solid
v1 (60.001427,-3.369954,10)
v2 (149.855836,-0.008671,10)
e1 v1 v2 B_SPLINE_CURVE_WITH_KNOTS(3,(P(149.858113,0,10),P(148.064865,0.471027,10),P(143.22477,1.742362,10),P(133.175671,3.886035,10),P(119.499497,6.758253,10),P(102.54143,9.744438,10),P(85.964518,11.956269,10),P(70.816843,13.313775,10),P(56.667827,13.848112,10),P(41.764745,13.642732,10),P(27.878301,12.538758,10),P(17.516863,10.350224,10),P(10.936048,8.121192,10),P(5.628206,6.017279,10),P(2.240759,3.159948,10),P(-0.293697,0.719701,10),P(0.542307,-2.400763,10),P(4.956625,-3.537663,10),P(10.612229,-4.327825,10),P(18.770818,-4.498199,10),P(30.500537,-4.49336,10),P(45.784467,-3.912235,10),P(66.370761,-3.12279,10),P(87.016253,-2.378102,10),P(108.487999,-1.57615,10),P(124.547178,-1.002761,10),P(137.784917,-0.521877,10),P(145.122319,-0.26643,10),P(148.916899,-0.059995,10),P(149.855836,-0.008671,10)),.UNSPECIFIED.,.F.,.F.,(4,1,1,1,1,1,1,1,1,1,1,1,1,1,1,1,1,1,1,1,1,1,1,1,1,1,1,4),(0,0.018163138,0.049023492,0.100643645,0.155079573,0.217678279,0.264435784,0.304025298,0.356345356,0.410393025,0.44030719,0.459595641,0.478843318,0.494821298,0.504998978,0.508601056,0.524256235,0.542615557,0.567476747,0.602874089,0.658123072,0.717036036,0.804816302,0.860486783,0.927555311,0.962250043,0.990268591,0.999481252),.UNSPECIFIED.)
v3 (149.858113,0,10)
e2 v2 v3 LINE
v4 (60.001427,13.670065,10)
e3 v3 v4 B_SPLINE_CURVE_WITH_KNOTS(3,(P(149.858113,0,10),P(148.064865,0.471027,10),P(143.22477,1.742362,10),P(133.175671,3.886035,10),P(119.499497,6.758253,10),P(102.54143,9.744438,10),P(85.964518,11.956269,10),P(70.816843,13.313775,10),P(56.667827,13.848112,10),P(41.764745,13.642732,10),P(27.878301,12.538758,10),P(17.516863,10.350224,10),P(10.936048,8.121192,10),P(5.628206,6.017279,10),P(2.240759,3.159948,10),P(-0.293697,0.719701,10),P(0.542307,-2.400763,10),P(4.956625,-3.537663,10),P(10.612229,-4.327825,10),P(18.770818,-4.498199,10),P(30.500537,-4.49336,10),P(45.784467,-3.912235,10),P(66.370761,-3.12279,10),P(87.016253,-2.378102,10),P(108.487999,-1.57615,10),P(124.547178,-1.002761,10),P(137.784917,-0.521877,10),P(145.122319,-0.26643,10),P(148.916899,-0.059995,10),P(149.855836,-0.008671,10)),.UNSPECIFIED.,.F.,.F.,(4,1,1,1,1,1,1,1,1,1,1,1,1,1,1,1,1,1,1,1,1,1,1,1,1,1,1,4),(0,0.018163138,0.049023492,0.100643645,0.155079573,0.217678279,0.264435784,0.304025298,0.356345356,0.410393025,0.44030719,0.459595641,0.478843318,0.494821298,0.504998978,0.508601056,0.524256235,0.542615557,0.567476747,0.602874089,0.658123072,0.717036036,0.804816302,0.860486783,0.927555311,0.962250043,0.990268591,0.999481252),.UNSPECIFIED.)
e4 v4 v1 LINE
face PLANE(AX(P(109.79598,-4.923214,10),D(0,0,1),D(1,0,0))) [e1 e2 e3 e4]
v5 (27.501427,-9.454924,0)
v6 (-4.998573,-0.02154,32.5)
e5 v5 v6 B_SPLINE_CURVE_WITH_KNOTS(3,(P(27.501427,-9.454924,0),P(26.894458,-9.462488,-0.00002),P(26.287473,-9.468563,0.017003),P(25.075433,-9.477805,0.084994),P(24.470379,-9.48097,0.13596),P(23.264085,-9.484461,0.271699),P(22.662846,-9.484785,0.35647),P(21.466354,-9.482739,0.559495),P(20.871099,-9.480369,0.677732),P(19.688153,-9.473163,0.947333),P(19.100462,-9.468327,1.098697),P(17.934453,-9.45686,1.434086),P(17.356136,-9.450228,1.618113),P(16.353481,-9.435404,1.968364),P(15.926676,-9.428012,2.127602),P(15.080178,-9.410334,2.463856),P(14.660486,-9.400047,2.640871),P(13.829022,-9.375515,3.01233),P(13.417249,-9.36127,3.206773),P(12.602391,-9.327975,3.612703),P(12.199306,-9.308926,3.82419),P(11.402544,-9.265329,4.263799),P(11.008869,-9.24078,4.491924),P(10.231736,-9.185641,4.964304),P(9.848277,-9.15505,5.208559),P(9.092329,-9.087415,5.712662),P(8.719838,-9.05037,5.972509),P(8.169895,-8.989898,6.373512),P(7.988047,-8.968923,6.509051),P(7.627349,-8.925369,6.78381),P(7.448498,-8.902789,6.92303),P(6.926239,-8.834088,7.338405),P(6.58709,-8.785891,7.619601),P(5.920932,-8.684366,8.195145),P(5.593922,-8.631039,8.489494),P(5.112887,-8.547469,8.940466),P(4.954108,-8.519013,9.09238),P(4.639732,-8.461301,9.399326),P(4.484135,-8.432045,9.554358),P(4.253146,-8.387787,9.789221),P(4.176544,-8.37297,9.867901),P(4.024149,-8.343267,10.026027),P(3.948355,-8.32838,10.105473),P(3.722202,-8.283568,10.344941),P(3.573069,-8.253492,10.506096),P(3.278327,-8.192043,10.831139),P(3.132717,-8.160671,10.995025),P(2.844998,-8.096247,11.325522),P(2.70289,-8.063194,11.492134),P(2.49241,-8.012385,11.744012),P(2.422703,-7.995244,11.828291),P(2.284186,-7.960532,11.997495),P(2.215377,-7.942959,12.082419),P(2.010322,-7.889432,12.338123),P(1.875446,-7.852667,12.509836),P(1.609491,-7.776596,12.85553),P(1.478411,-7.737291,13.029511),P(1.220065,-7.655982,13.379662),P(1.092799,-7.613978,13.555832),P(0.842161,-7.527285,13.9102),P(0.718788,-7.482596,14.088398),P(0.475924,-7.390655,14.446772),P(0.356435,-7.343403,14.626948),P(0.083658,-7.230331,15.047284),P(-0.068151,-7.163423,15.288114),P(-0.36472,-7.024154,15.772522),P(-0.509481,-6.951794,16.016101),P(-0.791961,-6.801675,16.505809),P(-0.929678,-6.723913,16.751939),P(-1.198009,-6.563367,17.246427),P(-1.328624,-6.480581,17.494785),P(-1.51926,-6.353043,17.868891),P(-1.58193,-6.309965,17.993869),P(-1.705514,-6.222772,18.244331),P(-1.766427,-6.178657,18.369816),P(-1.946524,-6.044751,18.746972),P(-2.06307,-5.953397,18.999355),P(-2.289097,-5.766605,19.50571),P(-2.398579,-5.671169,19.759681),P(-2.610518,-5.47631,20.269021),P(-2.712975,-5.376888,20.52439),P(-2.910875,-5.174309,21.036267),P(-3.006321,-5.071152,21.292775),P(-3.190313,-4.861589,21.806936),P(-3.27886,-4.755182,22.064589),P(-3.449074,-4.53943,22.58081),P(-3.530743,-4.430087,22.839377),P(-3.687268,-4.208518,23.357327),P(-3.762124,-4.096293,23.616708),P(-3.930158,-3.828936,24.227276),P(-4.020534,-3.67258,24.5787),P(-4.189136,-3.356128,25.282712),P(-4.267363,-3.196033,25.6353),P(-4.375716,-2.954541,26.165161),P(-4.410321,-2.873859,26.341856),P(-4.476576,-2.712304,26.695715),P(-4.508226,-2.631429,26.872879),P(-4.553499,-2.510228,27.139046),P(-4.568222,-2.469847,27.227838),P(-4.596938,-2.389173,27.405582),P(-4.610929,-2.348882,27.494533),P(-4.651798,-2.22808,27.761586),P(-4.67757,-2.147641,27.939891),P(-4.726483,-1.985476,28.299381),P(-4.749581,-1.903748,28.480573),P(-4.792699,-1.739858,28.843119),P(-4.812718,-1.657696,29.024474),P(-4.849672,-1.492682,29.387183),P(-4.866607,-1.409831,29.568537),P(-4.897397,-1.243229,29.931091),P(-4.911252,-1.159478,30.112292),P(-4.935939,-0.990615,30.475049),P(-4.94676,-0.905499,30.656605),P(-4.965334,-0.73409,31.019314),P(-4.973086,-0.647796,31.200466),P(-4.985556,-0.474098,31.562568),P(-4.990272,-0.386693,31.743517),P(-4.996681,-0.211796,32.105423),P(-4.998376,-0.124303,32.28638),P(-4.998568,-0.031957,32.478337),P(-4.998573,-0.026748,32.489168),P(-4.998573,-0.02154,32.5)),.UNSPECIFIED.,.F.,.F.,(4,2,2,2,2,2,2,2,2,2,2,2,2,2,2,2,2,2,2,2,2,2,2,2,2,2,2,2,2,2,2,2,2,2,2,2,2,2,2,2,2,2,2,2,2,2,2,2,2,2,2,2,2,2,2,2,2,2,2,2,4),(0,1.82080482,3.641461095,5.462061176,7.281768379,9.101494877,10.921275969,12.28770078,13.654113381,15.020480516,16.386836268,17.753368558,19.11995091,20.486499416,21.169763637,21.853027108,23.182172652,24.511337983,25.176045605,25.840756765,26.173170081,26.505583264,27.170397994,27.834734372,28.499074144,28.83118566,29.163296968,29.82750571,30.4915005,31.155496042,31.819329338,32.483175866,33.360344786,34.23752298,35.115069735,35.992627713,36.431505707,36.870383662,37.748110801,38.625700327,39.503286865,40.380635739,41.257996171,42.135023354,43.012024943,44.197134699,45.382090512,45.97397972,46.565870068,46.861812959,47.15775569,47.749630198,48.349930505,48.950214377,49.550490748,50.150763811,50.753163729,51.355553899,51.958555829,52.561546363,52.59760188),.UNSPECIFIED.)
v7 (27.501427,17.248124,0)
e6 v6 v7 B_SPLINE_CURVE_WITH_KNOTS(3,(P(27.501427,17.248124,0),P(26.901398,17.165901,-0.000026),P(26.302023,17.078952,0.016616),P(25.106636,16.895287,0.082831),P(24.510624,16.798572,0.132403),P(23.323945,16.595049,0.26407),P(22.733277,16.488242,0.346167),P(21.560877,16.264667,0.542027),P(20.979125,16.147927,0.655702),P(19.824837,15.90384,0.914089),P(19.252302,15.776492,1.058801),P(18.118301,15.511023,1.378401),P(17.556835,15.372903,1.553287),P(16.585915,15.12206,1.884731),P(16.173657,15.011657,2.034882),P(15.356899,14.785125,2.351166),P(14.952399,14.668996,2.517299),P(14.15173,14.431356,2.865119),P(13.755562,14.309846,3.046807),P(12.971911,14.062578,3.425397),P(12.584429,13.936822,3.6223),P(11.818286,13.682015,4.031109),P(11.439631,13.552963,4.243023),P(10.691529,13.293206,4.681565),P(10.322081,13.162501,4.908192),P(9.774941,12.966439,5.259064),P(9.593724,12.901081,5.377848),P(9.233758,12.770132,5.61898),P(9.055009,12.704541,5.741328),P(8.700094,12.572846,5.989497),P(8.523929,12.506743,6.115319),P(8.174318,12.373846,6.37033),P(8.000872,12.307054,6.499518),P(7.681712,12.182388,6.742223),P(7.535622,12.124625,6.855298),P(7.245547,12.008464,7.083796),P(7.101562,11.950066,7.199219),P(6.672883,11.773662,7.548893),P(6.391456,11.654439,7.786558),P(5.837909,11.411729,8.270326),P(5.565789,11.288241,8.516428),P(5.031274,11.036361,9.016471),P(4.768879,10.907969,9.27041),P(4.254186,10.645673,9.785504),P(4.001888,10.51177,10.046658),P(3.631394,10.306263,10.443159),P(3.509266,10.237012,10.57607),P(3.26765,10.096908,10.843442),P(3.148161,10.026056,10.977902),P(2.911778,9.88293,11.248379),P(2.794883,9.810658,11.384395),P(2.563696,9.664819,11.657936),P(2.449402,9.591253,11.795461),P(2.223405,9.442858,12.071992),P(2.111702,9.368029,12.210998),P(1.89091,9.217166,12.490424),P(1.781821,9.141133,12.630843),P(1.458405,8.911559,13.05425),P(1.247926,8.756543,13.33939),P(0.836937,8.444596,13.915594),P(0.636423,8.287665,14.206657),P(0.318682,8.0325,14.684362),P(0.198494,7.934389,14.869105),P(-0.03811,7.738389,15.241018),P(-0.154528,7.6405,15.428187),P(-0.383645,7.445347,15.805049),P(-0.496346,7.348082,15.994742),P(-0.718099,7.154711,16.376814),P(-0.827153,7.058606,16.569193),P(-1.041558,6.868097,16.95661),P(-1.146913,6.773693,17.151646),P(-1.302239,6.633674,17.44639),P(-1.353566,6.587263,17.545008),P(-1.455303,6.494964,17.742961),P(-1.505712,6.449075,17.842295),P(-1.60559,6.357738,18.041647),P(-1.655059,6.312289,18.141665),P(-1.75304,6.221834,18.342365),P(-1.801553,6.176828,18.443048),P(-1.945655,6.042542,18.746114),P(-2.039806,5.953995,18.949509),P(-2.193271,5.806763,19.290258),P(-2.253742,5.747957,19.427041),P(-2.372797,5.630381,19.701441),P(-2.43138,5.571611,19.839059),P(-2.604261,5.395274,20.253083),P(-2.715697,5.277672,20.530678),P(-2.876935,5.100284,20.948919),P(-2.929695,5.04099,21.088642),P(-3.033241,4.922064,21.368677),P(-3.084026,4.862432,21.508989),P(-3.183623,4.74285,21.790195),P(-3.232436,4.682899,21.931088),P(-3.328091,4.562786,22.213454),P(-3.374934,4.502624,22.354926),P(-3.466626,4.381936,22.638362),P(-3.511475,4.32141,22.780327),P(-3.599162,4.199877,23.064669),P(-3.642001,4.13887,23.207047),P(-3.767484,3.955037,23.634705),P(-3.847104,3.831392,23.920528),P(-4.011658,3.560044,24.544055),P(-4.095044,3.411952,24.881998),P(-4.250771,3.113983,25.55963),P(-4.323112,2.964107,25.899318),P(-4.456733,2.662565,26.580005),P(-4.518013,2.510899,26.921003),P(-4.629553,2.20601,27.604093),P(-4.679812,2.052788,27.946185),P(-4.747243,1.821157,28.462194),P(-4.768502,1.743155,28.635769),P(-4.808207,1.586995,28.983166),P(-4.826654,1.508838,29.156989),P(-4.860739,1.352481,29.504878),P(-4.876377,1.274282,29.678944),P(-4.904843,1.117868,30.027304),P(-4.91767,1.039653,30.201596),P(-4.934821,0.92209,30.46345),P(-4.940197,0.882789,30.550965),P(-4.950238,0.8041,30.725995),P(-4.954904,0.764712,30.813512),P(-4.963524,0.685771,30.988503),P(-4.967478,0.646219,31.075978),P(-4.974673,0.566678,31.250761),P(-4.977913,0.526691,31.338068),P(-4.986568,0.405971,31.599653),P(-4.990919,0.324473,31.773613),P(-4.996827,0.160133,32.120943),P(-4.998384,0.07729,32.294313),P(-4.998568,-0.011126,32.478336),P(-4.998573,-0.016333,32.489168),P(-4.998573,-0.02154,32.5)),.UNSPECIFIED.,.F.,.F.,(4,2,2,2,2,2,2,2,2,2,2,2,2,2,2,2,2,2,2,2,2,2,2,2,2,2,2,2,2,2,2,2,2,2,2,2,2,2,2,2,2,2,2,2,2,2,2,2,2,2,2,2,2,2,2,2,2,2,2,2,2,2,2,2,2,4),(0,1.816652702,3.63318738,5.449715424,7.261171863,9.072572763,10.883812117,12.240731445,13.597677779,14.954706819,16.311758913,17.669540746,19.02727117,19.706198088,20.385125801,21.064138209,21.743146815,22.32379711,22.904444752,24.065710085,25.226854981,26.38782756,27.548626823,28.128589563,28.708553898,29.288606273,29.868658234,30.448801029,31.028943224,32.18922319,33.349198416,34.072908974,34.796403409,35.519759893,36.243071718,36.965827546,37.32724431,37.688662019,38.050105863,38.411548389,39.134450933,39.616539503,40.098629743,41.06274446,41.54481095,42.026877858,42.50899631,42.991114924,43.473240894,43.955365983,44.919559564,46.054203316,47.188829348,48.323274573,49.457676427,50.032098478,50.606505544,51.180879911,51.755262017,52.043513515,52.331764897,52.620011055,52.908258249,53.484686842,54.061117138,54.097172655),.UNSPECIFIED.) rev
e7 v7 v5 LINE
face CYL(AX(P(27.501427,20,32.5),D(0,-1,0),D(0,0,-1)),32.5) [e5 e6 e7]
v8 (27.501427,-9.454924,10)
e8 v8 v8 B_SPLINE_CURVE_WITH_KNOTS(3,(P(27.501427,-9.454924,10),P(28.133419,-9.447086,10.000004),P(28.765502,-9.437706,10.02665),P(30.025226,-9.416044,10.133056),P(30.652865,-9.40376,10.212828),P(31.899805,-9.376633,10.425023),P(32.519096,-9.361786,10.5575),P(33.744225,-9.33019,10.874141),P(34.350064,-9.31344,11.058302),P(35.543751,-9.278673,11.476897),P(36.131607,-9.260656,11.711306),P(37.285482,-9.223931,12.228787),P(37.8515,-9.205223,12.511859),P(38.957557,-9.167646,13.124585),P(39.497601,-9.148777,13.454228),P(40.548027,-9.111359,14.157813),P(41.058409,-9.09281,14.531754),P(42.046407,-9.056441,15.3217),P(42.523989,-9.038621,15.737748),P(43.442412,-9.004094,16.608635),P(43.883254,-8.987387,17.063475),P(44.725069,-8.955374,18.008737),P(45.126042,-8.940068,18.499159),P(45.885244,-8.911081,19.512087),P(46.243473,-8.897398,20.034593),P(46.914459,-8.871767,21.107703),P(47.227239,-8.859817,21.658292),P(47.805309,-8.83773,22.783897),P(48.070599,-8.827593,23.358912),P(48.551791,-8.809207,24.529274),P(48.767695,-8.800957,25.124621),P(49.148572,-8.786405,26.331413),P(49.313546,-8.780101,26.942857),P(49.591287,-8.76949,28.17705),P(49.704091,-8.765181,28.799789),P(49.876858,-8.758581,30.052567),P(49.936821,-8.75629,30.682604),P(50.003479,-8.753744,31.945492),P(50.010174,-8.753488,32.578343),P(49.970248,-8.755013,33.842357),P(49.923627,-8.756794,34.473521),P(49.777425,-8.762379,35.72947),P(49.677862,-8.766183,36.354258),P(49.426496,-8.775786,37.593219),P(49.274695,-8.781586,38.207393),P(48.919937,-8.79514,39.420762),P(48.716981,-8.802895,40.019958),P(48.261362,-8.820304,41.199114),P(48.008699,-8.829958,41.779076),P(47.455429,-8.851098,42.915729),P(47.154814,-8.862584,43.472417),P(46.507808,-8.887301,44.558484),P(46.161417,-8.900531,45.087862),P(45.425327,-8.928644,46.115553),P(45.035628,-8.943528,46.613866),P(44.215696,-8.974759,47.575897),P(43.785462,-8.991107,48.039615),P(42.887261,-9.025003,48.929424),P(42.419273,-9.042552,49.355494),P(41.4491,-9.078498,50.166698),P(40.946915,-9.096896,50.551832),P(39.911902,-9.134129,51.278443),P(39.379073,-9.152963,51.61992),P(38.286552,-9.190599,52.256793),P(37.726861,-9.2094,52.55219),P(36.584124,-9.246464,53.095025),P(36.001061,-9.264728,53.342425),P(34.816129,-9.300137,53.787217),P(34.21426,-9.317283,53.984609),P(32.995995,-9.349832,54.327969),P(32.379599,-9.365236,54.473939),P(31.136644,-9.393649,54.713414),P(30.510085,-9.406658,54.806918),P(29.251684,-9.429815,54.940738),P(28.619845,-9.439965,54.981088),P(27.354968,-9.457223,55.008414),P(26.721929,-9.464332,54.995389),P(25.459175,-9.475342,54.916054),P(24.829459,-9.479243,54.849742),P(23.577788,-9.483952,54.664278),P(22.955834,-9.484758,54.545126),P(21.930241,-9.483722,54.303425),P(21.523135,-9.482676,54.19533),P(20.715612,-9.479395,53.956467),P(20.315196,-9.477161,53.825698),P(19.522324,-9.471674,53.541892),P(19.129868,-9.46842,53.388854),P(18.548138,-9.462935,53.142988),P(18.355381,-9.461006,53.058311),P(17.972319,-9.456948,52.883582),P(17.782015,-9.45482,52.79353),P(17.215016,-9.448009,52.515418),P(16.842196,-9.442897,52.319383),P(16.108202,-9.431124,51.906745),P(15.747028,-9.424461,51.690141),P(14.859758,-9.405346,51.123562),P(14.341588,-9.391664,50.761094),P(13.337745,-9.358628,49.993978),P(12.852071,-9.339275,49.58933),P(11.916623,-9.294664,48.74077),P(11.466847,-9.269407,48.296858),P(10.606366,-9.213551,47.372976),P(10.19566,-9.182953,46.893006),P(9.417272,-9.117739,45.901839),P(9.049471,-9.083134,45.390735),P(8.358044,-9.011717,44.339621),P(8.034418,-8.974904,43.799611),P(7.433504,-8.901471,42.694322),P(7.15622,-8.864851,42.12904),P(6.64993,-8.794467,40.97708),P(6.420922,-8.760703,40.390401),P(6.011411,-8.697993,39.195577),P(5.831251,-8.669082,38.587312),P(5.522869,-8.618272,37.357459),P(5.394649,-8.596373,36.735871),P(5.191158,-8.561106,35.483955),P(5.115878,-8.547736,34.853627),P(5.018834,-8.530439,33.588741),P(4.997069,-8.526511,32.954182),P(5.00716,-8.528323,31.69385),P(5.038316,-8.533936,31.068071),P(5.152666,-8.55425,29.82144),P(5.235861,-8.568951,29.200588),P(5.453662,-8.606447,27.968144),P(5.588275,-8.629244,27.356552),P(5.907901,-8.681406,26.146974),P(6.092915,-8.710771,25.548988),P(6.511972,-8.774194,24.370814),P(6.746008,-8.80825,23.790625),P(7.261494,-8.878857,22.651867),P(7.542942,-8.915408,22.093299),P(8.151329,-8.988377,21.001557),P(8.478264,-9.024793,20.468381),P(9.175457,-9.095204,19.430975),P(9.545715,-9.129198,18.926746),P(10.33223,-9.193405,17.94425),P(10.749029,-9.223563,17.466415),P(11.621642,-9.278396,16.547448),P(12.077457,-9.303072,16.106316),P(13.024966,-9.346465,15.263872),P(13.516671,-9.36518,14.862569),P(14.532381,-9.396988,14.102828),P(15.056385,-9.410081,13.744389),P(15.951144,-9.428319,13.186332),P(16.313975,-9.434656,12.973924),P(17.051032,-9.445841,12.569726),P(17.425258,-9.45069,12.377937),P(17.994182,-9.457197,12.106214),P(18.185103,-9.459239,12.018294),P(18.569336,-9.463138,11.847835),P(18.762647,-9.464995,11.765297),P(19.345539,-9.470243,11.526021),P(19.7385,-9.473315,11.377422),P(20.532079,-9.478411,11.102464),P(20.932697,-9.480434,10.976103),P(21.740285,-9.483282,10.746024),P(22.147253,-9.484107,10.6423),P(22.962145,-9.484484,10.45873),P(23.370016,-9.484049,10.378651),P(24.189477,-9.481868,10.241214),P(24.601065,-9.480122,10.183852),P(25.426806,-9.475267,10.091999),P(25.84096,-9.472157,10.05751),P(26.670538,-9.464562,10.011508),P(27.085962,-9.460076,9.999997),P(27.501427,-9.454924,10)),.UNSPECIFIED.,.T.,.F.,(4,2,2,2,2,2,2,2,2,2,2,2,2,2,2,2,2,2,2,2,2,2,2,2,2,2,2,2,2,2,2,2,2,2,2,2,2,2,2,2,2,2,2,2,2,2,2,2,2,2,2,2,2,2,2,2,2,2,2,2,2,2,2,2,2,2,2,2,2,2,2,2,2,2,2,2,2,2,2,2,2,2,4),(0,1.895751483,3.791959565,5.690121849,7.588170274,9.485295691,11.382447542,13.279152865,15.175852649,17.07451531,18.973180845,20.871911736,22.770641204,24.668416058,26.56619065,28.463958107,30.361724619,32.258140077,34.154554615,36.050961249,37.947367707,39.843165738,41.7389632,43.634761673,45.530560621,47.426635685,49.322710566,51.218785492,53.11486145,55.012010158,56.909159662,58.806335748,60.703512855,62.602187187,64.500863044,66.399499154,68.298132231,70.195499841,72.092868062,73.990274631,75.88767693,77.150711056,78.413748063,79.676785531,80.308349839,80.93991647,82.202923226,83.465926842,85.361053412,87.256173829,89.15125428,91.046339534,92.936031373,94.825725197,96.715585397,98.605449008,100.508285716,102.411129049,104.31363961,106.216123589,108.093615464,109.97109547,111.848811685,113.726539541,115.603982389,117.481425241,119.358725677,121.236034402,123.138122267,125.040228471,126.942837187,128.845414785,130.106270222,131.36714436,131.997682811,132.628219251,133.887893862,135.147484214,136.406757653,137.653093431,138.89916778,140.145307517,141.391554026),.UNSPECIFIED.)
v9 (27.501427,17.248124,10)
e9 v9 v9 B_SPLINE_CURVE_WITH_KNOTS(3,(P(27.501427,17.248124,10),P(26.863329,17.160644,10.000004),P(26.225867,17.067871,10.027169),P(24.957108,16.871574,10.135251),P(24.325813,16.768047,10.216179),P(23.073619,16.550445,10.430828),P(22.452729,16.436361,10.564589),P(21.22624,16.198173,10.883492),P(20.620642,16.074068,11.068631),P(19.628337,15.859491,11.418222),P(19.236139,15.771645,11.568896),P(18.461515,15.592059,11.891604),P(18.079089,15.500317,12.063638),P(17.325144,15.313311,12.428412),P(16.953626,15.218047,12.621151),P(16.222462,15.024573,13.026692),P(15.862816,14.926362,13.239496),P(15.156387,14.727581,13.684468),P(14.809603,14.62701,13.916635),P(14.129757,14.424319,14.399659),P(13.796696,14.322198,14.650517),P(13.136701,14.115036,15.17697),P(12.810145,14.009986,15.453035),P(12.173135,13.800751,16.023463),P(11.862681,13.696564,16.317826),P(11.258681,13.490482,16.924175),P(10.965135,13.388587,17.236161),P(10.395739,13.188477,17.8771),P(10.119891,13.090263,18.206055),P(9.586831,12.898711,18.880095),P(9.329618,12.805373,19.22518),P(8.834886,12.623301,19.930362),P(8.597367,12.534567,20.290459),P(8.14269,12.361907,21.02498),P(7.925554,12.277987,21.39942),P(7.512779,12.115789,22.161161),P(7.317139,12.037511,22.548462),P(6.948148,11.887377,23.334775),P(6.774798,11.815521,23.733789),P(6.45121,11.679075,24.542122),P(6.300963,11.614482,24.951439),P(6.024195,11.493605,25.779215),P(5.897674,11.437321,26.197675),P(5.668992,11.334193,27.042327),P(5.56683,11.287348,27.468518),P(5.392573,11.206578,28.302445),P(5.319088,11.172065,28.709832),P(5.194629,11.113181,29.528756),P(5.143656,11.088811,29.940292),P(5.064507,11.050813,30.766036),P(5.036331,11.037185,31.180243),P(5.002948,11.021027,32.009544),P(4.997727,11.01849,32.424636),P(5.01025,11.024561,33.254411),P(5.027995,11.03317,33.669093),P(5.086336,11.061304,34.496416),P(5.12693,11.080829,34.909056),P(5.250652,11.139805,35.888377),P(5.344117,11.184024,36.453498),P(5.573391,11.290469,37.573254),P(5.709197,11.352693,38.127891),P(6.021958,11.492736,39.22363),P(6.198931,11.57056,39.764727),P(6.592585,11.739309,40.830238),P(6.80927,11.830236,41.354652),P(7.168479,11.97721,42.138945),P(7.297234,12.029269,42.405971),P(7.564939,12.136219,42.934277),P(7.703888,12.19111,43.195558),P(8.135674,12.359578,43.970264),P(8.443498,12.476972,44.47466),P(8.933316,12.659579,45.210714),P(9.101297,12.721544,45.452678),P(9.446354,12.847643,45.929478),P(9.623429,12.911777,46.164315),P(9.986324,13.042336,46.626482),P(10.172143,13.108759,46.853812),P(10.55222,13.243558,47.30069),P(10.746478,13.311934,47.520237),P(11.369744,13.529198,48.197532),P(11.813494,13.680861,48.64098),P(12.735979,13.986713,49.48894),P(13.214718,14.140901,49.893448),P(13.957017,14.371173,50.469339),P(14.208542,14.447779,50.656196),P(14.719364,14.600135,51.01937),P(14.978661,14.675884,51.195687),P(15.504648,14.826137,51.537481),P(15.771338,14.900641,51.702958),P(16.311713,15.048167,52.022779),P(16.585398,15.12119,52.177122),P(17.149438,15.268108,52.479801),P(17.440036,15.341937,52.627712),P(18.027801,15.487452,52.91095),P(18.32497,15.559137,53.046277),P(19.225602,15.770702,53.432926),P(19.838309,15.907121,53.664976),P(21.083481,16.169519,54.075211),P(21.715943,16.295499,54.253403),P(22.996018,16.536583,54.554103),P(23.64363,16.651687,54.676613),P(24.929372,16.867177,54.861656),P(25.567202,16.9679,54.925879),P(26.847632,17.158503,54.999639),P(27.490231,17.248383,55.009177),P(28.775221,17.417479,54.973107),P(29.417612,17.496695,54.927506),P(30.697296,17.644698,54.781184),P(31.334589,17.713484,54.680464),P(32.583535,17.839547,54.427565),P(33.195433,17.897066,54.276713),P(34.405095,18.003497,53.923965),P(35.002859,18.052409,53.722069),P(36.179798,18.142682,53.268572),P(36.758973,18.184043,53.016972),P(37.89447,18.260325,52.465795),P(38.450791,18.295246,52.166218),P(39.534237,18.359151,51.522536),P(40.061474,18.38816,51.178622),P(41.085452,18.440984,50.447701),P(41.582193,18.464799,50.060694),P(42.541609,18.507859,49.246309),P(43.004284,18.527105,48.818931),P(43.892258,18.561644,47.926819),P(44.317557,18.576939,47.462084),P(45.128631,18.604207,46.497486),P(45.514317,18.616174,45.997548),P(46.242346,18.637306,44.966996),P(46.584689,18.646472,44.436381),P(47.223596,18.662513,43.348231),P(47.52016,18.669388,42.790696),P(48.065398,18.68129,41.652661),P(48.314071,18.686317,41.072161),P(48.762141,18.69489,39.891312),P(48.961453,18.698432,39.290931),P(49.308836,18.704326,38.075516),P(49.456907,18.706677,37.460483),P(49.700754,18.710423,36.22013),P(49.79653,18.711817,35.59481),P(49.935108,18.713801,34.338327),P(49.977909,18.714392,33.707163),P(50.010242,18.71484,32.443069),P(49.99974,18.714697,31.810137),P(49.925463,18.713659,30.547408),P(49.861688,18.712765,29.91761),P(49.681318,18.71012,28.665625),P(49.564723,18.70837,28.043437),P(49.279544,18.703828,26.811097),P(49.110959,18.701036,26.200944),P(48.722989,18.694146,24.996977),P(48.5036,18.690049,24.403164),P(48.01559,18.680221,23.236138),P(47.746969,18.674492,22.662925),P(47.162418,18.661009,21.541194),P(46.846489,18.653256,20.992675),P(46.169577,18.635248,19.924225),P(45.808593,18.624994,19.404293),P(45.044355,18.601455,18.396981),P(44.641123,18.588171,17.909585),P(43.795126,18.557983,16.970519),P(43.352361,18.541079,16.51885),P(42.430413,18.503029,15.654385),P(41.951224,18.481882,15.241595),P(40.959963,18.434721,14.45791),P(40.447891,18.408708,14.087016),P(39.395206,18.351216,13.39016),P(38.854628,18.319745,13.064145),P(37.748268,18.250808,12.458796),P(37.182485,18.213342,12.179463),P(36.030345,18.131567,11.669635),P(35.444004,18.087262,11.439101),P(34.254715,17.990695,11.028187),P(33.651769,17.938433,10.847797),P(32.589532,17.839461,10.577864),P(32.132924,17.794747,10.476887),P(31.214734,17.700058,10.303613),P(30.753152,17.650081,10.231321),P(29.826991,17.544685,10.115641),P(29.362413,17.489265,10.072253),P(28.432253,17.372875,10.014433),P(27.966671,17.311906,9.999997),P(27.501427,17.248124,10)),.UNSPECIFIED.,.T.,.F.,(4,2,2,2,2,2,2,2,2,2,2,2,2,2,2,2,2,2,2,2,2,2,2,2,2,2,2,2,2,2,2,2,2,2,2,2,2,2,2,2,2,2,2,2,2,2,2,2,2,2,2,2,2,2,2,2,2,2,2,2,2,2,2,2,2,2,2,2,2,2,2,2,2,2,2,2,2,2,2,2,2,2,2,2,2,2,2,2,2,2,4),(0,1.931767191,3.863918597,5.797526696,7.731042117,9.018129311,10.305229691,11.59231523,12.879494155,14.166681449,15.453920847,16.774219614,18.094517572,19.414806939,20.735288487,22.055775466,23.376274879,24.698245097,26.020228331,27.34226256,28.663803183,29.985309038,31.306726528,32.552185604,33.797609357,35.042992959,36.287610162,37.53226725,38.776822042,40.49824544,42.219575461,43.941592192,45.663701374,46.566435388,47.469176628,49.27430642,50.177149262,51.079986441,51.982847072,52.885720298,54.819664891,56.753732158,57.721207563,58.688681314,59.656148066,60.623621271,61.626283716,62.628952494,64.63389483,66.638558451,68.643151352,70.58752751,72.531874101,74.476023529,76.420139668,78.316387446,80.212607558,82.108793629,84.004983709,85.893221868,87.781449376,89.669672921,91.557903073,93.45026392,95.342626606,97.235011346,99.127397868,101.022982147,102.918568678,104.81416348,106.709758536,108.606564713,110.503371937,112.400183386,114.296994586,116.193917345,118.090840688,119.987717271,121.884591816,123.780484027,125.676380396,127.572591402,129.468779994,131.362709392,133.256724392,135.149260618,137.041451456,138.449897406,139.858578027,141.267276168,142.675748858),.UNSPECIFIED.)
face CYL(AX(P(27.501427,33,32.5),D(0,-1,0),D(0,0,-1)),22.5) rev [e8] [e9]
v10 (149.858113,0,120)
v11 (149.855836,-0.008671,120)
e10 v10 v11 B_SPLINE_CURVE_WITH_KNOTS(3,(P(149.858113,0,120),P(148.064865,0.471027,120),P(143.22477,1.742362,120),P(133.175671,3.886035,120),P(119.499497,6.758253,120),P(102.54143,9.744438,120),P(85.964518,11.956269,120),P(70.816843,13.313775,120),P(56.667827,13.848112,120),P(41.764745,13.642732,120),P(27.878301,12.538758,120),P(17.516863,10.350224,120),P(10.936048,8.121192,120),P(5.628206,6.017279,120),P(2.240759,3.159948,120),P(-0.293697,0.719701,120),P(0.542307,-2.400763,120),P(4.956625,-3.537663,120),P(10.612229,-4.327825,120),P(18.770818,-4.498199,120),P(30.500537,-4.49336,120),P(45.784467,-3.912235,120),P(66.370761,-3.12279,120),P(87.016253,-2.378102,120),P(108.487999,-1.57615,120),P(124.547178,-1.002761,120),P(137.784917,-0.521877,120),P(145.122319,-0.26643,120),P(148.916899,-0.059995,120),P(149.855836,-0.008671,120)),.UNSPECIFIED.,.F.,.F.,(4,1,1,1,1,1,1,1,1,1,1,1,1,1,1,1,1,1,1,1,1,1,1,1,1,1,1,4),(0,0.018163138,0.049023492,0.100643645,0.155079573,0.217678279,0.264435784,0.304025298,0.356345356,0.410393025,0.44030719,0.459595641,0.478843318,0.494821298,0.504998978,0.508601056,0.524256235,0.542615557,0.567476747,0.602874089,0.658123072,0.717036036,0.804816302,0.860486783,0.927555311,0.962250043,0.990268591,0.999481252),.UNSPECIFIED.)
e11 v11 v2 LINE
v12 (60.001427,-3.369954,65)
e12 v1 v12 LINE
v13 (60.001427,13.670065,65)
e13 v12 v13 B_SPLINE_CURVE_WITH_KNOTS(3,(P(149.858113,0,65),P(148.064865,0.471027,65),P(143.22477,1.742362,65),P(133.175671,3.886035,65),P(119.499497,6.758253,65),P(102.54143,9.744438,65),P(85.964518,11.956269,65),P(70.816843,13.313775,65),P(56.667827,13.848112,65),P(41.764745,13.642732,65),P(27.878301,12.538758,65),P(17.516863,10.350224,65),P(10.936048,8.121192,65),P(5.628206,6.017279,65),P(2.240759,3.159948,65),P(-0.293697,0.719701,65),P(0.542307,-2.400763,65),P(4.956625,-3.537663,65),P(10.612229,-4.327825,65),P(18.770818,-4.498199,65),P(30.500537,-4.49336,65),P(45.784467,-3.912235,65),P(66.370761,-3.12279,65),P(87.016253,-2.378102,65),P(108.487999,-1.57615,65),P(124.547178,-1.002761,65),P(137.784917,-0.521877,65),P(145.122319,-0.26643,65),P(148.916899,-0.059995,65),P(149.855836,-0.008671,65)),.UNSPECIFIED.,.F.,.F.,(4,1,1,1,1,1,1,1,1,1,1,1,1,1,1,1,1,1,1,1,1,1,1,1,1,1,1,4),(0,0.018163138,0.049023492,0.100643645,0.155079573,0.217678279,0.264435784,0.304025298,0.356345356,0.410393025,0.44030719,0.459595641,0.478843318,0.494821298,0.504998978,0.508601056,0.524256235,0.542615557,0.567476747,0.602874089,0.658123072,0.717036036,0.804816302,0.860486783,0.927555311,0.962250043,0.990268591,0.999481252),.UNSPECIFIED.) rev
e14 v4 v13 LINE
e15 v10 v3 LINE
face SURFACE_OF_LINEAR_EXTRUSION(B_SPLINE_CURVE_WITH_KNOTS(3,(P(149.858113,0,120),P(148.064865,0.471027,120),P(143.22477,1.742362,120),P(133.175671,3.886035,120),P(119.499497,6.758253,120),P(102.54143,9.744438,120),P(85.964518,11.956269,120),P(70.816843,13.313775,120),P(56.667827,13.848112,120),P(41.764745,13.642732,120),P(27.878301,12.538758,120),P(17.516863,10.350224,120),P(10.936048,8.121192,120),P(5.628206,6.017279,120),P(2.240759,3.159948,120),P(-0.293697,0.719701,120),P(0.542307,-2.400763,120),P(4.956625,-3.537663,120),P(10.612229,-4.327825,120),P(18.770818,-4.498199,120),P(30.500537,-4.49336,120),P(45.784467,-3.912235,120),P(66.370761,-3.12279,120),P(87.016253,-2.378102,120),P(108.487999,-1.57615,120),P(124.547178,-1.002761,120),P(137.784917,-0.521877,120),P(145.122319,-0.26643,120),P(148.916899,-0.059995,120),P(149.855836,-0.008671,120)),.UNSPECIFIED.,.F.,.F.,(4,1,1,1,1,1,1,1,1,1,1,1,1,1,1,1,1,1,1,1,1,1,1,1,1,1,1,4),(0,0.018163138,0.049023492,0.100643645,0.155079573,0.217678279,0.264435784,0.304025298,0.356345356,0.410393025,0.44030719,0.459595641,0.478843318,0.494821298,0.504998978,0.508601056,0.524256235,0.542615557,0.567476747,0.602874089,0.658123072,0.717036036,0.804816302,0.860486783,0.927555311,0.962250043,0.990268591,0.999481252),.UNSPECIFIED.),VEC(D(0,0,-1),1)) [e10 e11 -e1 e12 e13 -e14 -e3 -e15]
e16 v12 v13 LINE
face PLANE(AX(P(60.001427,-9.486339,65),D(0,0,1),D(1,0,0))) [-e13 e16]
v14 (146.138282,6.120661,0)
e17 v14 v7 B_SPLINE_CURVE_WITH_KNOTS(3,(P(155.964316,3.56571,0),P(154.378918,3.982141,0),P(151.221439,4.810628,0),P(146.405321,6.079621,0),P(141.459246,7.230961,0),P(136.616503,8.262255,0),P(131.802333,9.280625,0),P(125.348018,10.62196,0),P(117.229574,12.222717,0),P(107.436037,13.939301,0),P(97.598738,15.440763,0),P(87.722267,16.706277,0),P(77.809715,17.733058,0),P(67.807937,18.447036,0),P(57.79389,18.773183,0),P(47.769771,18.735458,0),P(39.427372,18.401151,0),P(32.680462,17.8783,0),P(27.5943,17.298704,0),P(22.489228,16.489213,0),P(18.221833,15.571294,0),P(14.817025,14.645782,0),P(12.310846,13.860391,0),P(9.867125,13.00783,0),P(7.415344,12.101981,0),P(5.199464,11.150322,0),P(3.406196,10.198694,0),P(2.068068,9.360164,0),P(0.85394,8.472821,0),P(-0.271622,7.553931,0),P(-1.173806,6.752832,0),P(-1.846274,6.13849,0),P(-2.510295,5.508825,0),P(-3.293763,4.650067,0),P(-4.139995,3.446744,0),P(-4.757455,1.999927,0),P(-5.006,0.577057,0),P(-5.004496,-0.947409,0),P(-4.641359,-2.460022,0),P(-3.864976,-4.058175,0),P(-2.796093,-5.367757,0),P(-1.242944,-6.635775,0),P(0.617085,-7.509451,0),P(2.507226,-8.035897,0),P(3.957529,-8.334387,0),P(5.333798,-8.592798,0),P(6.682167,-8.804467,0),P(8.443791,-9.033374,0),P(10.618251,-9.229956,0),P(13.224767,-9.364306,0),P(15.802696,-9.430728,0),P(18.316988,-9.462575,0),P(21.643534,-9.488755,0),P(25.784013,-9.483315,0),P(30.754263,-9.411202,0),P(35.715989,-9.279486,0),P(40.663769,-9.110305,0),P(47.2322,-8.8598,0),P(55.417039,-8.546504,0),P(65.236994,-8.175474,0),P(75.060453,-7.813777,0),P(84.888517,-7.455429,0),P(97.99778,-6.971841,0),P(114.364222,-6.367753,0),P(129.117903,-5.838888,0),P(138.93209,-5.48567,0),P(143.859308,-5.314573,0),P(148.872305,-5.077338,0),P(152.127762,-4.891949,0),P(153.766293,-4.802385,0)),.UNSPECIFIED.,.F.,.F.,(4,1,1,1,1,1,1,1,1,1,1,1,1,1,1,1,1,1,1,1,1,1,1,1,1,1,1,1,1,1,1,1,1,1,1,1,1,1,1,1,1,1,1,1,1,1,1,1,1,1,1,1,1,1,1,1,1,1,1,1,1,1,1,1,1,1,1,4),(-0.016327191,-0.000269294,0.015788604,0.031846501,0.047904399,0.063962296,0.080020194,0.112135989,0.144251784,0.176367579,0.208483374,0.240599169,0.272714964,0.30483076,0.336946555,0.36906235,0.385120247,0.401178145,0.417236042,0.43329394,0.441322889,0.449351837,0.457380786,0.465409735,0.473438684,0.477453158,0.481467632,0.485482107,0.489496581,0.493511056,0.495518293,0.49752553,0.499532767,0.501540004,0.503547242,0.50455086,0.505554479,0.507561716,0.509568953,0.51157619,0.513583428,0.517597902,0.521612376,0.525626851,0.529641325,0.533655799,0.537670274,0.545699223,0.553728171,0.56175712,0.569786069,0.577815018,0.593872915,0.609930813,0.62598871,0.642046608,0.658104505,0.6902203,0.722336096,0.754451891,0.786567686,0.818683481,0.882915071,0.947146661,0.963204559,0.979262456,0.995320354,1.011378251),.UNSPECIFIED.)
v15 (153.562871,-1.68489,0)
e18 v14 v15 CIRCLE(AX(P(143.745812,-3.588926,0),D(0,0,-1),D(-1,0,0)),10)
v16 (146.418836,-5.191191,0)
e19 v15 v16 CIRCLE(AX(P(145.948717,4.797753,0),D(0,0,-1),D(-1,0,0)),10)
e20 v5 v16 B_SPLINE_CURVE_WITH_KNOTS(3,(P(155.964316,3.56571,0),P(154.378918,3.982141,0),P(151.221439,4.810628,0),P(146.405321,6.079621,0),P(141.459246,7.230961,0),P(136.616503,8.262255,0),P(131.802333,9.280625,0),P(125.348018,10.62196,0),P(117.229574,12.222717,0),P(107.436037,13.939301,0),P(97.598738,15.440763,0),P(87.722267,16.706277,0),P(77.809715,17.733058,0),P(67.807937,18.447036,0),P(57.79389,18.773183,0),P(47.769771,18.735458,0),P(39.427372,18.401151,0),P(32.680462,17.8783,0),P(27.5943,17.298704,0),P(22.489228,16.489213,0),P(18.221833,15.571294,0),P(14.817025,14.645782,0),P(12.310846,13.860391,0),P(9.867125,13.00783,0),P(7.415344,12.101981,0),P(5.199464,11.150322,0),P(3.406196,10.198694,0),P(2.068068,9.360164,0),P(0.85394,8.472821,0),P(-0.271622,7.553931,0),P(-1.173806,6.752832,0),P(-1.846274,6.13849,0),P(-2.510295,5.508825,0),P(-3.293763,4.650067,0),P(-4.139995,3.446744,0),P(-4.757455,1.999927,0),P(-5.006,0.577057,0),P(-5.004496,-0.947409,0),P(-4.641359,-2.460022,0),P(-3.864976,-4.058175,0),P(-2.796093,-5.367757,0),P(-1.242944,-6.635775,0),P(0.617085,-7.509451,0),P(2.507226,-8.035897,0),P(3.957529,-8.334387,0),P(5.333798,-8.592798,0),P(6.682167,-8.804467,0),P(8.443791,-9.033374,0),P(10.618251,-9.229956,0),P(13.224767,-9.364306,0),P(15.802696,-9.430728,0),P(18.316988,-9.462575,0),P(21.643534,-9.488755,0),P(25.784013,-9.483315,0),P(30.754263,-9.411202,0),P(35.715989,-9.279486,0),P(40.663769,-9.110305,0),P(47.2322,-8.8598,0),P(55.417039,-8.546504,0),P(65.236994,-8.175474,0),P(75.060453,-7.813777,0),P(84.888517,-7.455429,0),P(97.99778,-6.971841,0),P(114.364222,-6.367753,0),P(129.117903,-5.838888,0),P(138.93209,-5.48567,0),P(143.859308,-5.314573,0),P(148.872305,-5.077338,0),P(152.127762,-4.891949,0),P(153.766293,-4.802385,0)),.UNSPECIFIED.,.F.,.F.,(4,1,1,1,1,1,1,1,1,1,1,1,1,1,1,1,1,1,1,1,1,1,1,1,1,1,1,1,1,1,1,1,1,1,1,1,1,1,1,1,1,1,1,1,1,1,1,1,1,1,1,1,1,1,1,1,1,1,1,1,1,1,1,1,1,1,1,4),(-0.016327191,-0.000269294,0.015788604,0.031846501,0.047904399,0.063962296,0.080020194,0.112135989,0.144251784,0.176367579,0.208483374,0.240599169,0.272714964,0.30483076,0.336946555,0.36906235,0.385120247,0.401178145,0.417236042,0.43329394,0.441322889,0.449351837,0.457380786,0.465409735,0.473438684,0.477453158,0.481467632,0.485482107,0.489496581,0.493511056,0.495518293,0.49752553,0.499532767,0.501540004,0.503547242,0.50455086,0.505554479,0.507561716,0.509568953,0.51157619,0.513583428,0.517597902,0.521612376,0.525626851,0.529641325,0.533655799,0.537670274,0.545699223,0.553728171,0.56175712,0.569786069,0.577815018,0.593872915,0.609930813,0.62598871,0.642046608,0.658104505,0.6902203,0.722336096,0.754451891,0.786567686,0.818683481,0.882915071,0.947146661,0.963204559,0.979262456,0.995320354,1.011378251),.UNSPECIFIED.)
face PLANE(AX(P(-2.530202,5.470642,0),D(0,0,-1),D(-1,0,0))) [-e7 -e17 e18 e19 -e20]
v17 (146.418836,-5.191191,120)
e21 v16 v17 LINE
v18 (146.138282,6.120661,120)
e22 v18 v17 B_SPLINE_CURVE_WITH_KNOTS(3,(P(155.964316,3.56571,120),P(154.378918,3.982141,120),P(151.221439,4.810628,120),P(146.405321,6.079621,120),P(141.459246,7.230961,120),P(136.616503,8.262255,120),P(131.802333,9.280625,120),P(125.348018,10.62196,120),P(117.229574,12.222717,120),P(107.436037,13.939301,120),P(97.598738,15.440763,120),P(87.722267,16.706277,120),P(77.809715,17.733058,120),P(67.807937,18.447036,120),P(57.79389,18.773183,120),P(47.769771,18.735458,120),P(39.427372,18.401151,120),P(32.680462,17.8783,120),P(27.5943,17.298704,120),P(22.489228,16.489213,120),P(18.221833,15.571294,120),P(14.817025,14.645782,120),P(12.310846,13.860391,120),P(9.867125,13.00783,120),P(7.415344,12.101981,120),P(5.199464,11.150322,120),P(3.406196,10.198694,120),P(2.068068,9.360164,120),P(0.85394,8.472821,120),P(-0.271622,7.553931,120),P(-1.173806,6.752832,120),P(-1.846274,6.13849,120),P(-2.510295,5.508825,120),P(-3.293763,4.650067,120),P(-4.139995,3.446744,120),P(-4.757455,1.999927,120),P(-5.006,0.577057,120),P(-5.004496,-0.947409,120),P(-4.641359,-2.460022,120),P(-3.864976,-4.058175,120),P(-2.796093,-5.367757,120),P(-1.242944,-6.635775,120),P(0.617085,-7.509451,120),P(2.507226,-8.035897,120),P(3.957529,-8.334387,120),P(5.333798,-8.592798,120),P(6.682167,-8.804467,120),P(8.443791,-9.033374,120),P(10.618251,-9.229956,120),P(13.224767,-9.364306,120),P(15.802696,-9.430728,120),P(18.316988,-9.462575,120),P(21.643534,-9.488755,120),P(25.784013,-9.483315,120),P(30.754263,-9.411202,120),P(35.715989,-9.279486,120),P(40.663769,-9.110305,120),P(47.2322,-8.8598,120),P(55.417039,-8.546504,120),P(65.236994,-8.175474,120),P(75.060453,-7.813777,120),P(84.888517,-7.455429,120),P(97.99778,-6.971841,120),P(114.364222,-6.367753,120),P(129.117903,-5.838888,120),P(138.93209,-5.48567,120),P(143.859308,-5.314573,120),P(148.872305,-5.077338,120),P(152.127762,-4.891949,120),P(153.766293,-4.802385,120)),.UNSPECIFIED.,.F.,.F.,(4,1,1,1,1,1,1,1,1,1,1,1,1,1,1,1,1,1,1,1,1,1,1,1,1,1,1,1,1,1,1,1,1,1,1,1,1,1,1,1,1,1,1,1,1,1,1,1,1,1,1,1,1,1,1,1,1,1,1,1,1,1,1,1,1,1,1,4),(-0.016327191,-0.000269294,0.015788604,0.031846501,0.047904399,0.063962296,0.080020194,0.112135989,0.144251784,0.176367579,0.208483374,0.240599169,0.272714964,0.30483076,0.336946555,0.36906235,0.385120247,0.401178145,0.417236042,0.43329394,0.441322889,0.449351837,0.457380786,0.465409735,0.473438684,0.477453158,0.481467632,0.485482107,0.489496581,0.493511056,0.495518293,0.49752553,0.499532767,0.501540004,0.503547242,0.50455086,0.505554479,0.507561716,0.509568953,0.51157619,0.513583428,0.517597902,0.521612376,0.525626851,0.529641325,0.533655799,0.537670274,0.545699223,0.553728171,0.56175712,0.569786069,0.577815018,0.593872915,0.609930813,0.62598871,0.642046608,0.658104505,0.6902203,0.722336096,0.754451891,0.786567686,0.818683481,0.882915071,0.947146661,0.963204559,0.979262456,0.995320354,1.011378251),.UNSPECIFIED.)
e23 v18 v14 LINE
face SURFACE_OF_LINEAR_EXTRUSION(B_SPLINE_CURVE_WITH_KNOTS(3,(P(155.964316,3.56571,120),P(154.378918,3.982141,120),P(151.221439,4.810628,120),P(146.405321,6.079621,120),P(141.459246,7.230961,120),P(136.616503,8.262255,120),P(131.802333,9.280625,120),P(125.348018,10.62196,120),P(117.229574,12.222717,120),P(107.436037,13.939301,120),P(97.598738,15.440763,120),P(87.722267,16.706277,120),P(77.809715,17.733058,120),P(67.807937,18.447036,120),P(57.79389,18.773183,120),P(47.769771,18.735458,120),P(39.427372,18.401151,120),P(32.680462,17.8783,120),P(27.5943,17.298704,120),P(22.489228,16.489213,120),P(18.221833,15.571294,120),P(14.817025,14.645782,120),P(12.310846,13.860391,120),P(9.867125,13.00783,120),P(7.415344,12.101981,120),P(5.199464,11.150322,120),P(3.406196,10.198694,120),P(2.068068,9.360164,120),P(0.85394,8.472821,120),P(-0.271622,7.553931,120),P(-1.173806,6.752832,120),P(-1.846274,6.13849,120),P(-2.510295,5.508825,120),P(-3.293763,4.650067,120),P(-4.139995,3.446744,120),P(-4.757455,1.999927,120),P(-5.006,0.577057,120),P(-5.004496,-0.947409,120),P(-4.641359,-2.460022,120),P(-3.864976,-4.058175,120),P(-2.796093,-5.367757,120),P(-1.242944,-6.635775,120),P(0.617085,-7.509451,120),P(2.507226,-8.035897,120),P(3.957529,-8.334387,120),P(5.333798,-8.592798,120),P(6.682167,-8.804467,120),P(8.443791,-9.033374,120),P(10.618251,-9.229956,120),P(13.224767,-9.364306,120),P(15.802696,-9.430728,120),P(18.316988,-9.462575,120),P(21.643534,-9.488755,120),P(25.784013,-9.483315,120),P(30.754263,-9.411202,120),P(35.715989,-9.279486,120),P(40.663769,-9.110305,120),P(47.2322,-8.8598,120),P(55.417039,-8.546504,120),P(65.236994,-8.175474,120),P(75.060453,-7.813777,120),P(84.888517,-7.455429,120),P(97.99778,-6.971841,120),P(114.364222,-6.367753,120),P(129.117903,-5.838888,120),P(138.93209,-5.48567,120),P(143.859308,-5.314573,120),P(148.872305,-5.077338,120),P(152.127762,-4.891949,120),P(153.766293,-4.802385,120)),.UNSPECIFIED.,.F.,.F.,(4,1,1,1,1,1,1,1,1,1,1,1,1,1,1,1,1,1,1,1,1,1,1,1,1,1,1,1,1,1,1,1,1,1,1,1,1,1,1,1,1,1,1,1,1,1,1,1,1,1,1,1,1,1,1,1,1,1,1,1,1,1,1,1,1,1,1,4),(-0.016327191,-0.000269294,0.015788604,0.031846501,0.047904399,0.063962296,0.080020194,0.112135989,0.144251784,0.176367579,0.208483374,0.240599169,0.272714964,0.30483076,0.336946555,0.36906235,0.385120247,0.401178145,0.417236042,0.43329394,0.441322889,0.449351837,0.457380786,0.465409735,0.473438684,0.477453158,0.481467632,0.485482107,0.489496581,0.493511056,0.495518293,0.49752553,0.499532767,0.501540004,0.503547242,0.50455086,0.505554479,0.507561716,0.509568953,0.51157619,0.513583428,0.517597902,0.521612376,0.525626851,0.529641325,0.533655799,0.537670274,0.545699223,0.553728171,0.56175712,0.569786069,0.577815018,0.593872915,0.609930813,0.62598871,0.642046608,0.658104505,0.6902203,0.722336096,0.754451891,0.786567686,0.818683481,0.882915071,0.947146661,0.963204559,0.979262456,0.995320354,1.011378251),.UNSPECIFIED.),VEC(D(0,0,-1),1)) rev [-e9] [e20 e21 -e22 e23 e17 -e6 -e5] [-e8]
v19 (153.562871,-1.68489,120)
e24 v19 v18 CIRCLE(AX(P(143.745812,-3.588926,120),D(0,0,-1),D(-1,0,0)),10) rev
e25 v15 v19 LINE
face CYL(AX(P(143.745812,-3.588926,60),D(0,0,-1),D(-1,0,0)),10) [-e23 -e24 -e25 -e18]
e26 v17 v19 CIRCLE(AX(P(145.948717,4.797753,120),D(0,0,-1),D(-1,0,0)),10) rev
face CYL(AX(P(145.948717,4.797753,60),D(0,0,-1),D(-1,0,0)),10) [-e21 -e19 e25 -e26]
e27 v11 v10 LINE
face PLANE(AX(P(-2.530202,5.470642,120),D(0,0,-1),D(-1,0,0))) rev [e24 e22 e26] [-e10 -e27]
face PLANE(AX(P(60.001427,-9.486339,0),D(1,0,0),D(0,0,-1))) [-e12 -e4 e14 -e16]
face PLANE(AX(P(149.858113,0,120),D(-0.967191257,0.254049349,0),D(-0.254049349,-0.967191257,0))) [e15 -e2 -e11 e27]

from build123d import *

# Parameters (mm, degrees)
BOSS_EXTRUDE1_DEPTH             = 120
BOSS_EXTRUDE2_DEPTH             = 10
BOSS_EXTRUDE3_REACH             = 199.677
SKETCH4_W                       = 65
SKETCH4_H                       = 65
BOSS_EXTRUDE3_DIRECTION_2_REACH = 199.677
CUT_EXTRUDE1_DEPTH              = 33
CUT_EXTRUDE1_DEPTH_BACK         = 25
SKETCH4_2_R                     = 22.5
FILLET1_START                   = -1
FILLET1_DEPTH                   = 121
CUT_EXTRUDE2_DEPTH              = 20
CUT_EXTRUDE2_DEPTH_BACK         = 15


with BuildPart() as part:
    # Sketch1 → Boss-Extrude1 (new body)
    with BuildSketch(Plane.XY):
        with BuildLine():
            Line((155.964316355, 3.565709543), (153.766293041, -4.802384858))
            add(Edge.make_bspline(
                [(155.964316355, 3.565709543), (154.378918322, 3.982141489), (151.221438672, 4.810628214), (146.405320696, 6.079621314), (141.459245587, 7.230960659), (136.616503343, 8.262254652), (131.802332964, 9.280625302), (125.348017994, 10.621960321), (117.229574348, 12.22271703), (107.436037499, 13.939301482), (97.598738468, 15.440763267), (87.722266926, 16.70627728), (77.809714958, 17.733057917), (67.80793717, 18.447035533), (57.793889713, 18.773182879), (47.769770538, 18.735457883), (39.427372262, 18.401151216), (32.680462384, 17.878299596), (27.594300218, 17.298704257), (22.489228117, 16.489212541), (18.221832789, 15.571293682), (14.817024759, 14.645782316), (12.31084577, 13.860390887), (9.867125223, 13.00783032), (7.415344177, 12.101980937), (5.199464012, 11.150322343), (3.406195729, 10.198694172), (2.068067577, 9.360164368), (0.853940441, 8.472821349), (-0.27162176, 7.553930707), (-1.173806492, 6.752832287), (-1.846273696, 6.138489504), (-2.510294599, 5.508824521), (-3.293762827, 4.650066841), (-4.139995357, 3.446744203), (-4.757454598, 1.999926732), (-5.006000217, 0.577057349), (-5.004495543, -0.947409484), (-4.641359358, -2.460021664), (-3.864975901, -4.058175269), (-2.796093096, -5.367757007), (-1.242943599, -6.635774778), (0.617085196, -7.509451493), (2.507225543, -8.035896586), (3.957529203, -8.334387132), (5.333798484, -8.592798441), (6.682167164, -8.804467221), (8.44379095, -9.033373876), (10.618251219, -9.22995636), (13.224767296, -9.364305661), (15.802696221, -9.430728222), (18.31698775, -9.462575421), (21.643533924, -9.488754653), (25.784013425, -9.483315396), (30.754262974, -9.411201744), (35.715989191, -9.27948568), (40.663768741, -9.11030498), (47.232199521, -8.859800124), (55.41703855, -8.546503659), (65.236994413, -8.175473725), (75.060452553, -7.813776944), (84.888517086, -7.455428603), (97.997779582, -6.971840733), (114.364222088, -6.367752612), (129.11790303, -5.838888298), (138.932090495, -5.485670307), (143.859307965, -5.314572629), (148.872305041, -5.077337716), (152.127761912, -4.891949037), (153.766293041, -4.802384858)],
                knots=[-0.016327191, -0.016327191, -0.016327191, -0.016327191, -0.000269294, 0.015788604, 0.031846501, 0.047904399, 0.063962296, 0.080020194, 0.112135989, 0.144251784, 0.176367579, 0.208483374, 0.240599169, 0.272714964, 0.30483076, 0.336946555, 0.36906235, 0.385120247, 0.401178145, 0.417236042, 0.43329394, 0.441322889, 0.449351837, 0.457380786, 0.465409735, 0.473438684, 0.477453158, 0.481467632, 0.485482107, 0.489496581, 0.493511056, 0.495518293, 0.49752553, 0.499532767, 0.501540004, 0.503547242, 0.50455086, 0.505554479, 0.507561716, 0.509568953, 0.51157619, 0.513583428, 0.517597902, 0.521612376, 0.525626851, 0.529641325, 0.533655799, 0.537670274, 0.545699223, 0.553728171, 0.56175712, 0.569786069, 0.577815018, 0.593872915, 0.609930813, 0.62598871, 0.642046608, 0.658104505, 0.6902203, 0.722336096, 0.754451891, 0.786567686, 0.818683481, 0.882915071, 0.947146661, 0.963204559, 0.979262456, 0.995320354, 1.011378251, 1.011378251, 1.011378251, 1.011378251], degree=3))
        make_face()
        with BuildLine():
            Line((149.858113324, 0), (149.855835651, -0.00867133))
            add(Edge.make_bspline(
                [(149.858113324, 0), (148.064864637, 0.471027481), (143.224769961, 1.742362118), (133.175670914, 3.886034627), (119.499496989, 6.758253215), (102.541429982, 9.744438365), (85.964517719, 11.956268792), (70.816843468, 13.313775138), (56.667826786, 13.848112216), (41.764744871, 13.642732387), (27.878301368, 12.538757837), (17.516862727, 10.350224421), (10.936048166, 8.121191966), (5.628206266, 6.017279046), (2.240759138, 3.159947775), (-0.293696922, 0.719700584), (0.542306535, -2.400763115), (4.956625023, -3.537663372), (10.612229447, -4.327824942), (18.770818109, -4.498199411), (30.500536827, -4.493359859), (45.784466548, -3.912234803), (66.370760986, -3.122790256), (87.01625275, -2.378102064), (108.487999193, -1.576150156), (124.547177916, -1.002761448), (137.784916862, -0.521876849), (145.122318881, -0.266429976), (148.916898874, -0.059994798), (149.855835651, -0.00867133)],
                knots=[0, 0, 0, 0, 0.018163138, 0.049023492, 0.100643645, 0.155079573, 0.217678279, 0.264435784, 0.304025298, 0.356345356, 0.410393025, 0.44030719, 0.459595641, 0.478843318, 0.494821298, 0.504998978, 0.508601056, 0.524256235, 0.542615557, 0.567476747, 0.602874089, 0.658123072, 0.717036036, 0.804816302, 0.860486783, 0.927555311, 0.962250043, 0.990268591, 0.999481252, 0.999481252, 0.999481252, 0.999481252], degree=3))
        make_face(mode=Mode.SUBTRACT)
    extrude(amount=BOSS_EXTRUDE1_DEPTH)

    # Sketch3 → Boss-Extrude2 (add)
    with BuildSketch(Plane(origin=(0, 0, 0), x_dir=(-1, 0, 0), z_dir=(0, 0, -1))):
        with BuildLine():
            add(Edge.make_bspline(
                [(0.878784699, 2.816886777), (-0.440330705, 4.35710096), (-6.432358309, 9.398319725), (-25.880607147, 15.556199748), (-57.640660956, 15.486635628), (-94.316428091, 14.90132494), (-121.955402319, 9.416295338), (-155.648348192, 3.742322043), (-152.299631395, -5.019044201), (-127.442883747, -2.619953533), (-110.657226211, -5.850784995), (-70.675350432, -4.951680612), (-43.15497178, -7.181610376), (-11.739005475, -7.267310955), (7.783964303, -5.245679637), (0.878784699, 2.816886777)],
                knots=[0, 0, 0, 0, 0.019858562, 0.056297241, 0.104261526, 0.197906982, 0.252888713, 0.300349685, 0.312342472, 0.372816584, 0.481473762, 0.67443882, 0.863490173, 0.896046291, 1, 1, 1, 1], degree=3))
        make_face()
    extrude(amount=-BOSS_EXTRUDE2_DEPTH)

    # Sketch4 → Boss-Extrude3 (add, up to next)
    with BuildSketch(Plane(origin=(0, 0, 0), x_dir=(1, 0, 0), z_dir=(0, 1, 0)), mode=Mode.PRIVATE) as boss_extrude3_sk1:
        with Locations((27.501426989, -32.5)):
            Rectangle(SKETCH4_W, SKETCH4_H)
    boss_extrude3_tool1 = extrude(boss_extrude3_sk1.sketch, amount=BOSS_EXTRUDE3_REACH, mode=Mode.PRIVATE) - part.part
    add(boss_extrude3_tool1.solids().sort_by_distance((27.501427, 0, 32.5))[0])

    # Sketch4 → Boss-Extrude3 direction 2 (add, up to next)
    with BuildSketch(Plane(origin=(0, 0, 0), x_dir=(1, 0, 0), z_dir=(0, 1, 0)), mode=Mode.PRIVATE) as boss_extrude3_direction_2_sk1:
        with Locations((27.501426989, -32.5)):
            Rectangle(SKETCH4_W, SKETCH4_H)
    boss_extrude3_direction_2_tool1 = extrude(boss_extrude3_direction_2_sk1.sketch, amount=-BOSS_EXTRUDE3_DIRECTION_2_REACH, mode=Mode.PRIVATE) - part.part
    add(boss_extrude3_direction_2_tool1.solids().sort_by_distance((27.501427, 0, 32.5))[0])

    # Sketch4<2> → Cut-Extrude1 (cut, two sides: drawn at the far end of the back side and taken through both)
    with BuildSketch(Plane(origin=(0, 0, 0), x_dir=(1, 0, 0), z_dir=(0, 1, 0)).offset(-CUT_EXTRUDE1_DEPTH_BACK)):
        with Locations(Location((27.501426989, -32.5, 0), (0, 0, 90))):
            Circle(SKETCH4_2_R)
    extrude(amount=CUT_EXTRUDE1_DEPTH + CUT_EXTRUDE1_DEPTH_BACK, mode=Mode.SUBTRACT)

    # Fillet1: read off the stored shape, not the designer's step
    # Fillet1 outline → Fillet1 (cut)
    with BuildSketch(Plane.XY.offset(FILLET1_START)):
        with BuildLine():
            add(Edge.make_bspline(
                [(155.964316355, 3.565709543), (154.378918322, 3.982141489), (151.221438672, 4.810628214), (147.930041559, 5.677874458), (146.220126624, 6.100494295), (146.138282279, 6.120660977)],
                knots=[-0.016327191, -0.016327191, -0.016327191, -0.016327191, -0.000269294, 0.015788604, 0.016595331, 0.016595331, 0.016595331, 0.016595331], degree=3))
            ThreePointArc((146.138282279, 6.120660977), (150.991487115, 3.303111972), (153.562870933, -1.684890116))
            ThreePointArc((153.562870933, -1.684890116), (150.354667633, -4.179306809), (146.418835534, -5.19119057))
            add(Edge.make_bspline(
                [(146.418835534, -5.19119057), (147.231820092, -5.152928346), (149.703780843, -5.029987618), (152.127761912, -4.891949037), (153.766293041, -4.802384858)],
                knots=[0.987465147, 0.987465147, 0.987465147, 0.987465147, 0.995320354, 1.011378251, 1.011378251, 1.011378251, 1.011378251], degree=3))
            Line((153.766293041, -4.802384858), (155.964316355, 3.565709543))
        make_face()
    extrude(amount=FILLET1_DEPTH, mode=Mode.SUBTRACT)

    # Sketch6 → Cut-Extrude2 (cut, two sides: drawn at the far end of the back side and taken through both)
    with BuildSketch(Plane(origin=(0, 0, 0), x_dir=(1, 0, 0), z_dir=(0, 1, 0)).offset(-CUT_EXTRUDE2_DEPTH_BACK)):
        with BuildLine():
            Line((-4.998573011, -32.5), (-4.998573011, 0))
            Line((-4.998573011, 0), (27.501426989, 0))
            ThreePointArc((27.501426989, 0), (4.5204566, -9.519029611), (-4.998573011, -32.5))
        make_face()
    extrude(amount=CUT_EXTRUDE2_DEPTH + CUT_EXTRUDE2_DEPTH_BACK, mode=Mode.SUBTRACT)


solid = part.part
